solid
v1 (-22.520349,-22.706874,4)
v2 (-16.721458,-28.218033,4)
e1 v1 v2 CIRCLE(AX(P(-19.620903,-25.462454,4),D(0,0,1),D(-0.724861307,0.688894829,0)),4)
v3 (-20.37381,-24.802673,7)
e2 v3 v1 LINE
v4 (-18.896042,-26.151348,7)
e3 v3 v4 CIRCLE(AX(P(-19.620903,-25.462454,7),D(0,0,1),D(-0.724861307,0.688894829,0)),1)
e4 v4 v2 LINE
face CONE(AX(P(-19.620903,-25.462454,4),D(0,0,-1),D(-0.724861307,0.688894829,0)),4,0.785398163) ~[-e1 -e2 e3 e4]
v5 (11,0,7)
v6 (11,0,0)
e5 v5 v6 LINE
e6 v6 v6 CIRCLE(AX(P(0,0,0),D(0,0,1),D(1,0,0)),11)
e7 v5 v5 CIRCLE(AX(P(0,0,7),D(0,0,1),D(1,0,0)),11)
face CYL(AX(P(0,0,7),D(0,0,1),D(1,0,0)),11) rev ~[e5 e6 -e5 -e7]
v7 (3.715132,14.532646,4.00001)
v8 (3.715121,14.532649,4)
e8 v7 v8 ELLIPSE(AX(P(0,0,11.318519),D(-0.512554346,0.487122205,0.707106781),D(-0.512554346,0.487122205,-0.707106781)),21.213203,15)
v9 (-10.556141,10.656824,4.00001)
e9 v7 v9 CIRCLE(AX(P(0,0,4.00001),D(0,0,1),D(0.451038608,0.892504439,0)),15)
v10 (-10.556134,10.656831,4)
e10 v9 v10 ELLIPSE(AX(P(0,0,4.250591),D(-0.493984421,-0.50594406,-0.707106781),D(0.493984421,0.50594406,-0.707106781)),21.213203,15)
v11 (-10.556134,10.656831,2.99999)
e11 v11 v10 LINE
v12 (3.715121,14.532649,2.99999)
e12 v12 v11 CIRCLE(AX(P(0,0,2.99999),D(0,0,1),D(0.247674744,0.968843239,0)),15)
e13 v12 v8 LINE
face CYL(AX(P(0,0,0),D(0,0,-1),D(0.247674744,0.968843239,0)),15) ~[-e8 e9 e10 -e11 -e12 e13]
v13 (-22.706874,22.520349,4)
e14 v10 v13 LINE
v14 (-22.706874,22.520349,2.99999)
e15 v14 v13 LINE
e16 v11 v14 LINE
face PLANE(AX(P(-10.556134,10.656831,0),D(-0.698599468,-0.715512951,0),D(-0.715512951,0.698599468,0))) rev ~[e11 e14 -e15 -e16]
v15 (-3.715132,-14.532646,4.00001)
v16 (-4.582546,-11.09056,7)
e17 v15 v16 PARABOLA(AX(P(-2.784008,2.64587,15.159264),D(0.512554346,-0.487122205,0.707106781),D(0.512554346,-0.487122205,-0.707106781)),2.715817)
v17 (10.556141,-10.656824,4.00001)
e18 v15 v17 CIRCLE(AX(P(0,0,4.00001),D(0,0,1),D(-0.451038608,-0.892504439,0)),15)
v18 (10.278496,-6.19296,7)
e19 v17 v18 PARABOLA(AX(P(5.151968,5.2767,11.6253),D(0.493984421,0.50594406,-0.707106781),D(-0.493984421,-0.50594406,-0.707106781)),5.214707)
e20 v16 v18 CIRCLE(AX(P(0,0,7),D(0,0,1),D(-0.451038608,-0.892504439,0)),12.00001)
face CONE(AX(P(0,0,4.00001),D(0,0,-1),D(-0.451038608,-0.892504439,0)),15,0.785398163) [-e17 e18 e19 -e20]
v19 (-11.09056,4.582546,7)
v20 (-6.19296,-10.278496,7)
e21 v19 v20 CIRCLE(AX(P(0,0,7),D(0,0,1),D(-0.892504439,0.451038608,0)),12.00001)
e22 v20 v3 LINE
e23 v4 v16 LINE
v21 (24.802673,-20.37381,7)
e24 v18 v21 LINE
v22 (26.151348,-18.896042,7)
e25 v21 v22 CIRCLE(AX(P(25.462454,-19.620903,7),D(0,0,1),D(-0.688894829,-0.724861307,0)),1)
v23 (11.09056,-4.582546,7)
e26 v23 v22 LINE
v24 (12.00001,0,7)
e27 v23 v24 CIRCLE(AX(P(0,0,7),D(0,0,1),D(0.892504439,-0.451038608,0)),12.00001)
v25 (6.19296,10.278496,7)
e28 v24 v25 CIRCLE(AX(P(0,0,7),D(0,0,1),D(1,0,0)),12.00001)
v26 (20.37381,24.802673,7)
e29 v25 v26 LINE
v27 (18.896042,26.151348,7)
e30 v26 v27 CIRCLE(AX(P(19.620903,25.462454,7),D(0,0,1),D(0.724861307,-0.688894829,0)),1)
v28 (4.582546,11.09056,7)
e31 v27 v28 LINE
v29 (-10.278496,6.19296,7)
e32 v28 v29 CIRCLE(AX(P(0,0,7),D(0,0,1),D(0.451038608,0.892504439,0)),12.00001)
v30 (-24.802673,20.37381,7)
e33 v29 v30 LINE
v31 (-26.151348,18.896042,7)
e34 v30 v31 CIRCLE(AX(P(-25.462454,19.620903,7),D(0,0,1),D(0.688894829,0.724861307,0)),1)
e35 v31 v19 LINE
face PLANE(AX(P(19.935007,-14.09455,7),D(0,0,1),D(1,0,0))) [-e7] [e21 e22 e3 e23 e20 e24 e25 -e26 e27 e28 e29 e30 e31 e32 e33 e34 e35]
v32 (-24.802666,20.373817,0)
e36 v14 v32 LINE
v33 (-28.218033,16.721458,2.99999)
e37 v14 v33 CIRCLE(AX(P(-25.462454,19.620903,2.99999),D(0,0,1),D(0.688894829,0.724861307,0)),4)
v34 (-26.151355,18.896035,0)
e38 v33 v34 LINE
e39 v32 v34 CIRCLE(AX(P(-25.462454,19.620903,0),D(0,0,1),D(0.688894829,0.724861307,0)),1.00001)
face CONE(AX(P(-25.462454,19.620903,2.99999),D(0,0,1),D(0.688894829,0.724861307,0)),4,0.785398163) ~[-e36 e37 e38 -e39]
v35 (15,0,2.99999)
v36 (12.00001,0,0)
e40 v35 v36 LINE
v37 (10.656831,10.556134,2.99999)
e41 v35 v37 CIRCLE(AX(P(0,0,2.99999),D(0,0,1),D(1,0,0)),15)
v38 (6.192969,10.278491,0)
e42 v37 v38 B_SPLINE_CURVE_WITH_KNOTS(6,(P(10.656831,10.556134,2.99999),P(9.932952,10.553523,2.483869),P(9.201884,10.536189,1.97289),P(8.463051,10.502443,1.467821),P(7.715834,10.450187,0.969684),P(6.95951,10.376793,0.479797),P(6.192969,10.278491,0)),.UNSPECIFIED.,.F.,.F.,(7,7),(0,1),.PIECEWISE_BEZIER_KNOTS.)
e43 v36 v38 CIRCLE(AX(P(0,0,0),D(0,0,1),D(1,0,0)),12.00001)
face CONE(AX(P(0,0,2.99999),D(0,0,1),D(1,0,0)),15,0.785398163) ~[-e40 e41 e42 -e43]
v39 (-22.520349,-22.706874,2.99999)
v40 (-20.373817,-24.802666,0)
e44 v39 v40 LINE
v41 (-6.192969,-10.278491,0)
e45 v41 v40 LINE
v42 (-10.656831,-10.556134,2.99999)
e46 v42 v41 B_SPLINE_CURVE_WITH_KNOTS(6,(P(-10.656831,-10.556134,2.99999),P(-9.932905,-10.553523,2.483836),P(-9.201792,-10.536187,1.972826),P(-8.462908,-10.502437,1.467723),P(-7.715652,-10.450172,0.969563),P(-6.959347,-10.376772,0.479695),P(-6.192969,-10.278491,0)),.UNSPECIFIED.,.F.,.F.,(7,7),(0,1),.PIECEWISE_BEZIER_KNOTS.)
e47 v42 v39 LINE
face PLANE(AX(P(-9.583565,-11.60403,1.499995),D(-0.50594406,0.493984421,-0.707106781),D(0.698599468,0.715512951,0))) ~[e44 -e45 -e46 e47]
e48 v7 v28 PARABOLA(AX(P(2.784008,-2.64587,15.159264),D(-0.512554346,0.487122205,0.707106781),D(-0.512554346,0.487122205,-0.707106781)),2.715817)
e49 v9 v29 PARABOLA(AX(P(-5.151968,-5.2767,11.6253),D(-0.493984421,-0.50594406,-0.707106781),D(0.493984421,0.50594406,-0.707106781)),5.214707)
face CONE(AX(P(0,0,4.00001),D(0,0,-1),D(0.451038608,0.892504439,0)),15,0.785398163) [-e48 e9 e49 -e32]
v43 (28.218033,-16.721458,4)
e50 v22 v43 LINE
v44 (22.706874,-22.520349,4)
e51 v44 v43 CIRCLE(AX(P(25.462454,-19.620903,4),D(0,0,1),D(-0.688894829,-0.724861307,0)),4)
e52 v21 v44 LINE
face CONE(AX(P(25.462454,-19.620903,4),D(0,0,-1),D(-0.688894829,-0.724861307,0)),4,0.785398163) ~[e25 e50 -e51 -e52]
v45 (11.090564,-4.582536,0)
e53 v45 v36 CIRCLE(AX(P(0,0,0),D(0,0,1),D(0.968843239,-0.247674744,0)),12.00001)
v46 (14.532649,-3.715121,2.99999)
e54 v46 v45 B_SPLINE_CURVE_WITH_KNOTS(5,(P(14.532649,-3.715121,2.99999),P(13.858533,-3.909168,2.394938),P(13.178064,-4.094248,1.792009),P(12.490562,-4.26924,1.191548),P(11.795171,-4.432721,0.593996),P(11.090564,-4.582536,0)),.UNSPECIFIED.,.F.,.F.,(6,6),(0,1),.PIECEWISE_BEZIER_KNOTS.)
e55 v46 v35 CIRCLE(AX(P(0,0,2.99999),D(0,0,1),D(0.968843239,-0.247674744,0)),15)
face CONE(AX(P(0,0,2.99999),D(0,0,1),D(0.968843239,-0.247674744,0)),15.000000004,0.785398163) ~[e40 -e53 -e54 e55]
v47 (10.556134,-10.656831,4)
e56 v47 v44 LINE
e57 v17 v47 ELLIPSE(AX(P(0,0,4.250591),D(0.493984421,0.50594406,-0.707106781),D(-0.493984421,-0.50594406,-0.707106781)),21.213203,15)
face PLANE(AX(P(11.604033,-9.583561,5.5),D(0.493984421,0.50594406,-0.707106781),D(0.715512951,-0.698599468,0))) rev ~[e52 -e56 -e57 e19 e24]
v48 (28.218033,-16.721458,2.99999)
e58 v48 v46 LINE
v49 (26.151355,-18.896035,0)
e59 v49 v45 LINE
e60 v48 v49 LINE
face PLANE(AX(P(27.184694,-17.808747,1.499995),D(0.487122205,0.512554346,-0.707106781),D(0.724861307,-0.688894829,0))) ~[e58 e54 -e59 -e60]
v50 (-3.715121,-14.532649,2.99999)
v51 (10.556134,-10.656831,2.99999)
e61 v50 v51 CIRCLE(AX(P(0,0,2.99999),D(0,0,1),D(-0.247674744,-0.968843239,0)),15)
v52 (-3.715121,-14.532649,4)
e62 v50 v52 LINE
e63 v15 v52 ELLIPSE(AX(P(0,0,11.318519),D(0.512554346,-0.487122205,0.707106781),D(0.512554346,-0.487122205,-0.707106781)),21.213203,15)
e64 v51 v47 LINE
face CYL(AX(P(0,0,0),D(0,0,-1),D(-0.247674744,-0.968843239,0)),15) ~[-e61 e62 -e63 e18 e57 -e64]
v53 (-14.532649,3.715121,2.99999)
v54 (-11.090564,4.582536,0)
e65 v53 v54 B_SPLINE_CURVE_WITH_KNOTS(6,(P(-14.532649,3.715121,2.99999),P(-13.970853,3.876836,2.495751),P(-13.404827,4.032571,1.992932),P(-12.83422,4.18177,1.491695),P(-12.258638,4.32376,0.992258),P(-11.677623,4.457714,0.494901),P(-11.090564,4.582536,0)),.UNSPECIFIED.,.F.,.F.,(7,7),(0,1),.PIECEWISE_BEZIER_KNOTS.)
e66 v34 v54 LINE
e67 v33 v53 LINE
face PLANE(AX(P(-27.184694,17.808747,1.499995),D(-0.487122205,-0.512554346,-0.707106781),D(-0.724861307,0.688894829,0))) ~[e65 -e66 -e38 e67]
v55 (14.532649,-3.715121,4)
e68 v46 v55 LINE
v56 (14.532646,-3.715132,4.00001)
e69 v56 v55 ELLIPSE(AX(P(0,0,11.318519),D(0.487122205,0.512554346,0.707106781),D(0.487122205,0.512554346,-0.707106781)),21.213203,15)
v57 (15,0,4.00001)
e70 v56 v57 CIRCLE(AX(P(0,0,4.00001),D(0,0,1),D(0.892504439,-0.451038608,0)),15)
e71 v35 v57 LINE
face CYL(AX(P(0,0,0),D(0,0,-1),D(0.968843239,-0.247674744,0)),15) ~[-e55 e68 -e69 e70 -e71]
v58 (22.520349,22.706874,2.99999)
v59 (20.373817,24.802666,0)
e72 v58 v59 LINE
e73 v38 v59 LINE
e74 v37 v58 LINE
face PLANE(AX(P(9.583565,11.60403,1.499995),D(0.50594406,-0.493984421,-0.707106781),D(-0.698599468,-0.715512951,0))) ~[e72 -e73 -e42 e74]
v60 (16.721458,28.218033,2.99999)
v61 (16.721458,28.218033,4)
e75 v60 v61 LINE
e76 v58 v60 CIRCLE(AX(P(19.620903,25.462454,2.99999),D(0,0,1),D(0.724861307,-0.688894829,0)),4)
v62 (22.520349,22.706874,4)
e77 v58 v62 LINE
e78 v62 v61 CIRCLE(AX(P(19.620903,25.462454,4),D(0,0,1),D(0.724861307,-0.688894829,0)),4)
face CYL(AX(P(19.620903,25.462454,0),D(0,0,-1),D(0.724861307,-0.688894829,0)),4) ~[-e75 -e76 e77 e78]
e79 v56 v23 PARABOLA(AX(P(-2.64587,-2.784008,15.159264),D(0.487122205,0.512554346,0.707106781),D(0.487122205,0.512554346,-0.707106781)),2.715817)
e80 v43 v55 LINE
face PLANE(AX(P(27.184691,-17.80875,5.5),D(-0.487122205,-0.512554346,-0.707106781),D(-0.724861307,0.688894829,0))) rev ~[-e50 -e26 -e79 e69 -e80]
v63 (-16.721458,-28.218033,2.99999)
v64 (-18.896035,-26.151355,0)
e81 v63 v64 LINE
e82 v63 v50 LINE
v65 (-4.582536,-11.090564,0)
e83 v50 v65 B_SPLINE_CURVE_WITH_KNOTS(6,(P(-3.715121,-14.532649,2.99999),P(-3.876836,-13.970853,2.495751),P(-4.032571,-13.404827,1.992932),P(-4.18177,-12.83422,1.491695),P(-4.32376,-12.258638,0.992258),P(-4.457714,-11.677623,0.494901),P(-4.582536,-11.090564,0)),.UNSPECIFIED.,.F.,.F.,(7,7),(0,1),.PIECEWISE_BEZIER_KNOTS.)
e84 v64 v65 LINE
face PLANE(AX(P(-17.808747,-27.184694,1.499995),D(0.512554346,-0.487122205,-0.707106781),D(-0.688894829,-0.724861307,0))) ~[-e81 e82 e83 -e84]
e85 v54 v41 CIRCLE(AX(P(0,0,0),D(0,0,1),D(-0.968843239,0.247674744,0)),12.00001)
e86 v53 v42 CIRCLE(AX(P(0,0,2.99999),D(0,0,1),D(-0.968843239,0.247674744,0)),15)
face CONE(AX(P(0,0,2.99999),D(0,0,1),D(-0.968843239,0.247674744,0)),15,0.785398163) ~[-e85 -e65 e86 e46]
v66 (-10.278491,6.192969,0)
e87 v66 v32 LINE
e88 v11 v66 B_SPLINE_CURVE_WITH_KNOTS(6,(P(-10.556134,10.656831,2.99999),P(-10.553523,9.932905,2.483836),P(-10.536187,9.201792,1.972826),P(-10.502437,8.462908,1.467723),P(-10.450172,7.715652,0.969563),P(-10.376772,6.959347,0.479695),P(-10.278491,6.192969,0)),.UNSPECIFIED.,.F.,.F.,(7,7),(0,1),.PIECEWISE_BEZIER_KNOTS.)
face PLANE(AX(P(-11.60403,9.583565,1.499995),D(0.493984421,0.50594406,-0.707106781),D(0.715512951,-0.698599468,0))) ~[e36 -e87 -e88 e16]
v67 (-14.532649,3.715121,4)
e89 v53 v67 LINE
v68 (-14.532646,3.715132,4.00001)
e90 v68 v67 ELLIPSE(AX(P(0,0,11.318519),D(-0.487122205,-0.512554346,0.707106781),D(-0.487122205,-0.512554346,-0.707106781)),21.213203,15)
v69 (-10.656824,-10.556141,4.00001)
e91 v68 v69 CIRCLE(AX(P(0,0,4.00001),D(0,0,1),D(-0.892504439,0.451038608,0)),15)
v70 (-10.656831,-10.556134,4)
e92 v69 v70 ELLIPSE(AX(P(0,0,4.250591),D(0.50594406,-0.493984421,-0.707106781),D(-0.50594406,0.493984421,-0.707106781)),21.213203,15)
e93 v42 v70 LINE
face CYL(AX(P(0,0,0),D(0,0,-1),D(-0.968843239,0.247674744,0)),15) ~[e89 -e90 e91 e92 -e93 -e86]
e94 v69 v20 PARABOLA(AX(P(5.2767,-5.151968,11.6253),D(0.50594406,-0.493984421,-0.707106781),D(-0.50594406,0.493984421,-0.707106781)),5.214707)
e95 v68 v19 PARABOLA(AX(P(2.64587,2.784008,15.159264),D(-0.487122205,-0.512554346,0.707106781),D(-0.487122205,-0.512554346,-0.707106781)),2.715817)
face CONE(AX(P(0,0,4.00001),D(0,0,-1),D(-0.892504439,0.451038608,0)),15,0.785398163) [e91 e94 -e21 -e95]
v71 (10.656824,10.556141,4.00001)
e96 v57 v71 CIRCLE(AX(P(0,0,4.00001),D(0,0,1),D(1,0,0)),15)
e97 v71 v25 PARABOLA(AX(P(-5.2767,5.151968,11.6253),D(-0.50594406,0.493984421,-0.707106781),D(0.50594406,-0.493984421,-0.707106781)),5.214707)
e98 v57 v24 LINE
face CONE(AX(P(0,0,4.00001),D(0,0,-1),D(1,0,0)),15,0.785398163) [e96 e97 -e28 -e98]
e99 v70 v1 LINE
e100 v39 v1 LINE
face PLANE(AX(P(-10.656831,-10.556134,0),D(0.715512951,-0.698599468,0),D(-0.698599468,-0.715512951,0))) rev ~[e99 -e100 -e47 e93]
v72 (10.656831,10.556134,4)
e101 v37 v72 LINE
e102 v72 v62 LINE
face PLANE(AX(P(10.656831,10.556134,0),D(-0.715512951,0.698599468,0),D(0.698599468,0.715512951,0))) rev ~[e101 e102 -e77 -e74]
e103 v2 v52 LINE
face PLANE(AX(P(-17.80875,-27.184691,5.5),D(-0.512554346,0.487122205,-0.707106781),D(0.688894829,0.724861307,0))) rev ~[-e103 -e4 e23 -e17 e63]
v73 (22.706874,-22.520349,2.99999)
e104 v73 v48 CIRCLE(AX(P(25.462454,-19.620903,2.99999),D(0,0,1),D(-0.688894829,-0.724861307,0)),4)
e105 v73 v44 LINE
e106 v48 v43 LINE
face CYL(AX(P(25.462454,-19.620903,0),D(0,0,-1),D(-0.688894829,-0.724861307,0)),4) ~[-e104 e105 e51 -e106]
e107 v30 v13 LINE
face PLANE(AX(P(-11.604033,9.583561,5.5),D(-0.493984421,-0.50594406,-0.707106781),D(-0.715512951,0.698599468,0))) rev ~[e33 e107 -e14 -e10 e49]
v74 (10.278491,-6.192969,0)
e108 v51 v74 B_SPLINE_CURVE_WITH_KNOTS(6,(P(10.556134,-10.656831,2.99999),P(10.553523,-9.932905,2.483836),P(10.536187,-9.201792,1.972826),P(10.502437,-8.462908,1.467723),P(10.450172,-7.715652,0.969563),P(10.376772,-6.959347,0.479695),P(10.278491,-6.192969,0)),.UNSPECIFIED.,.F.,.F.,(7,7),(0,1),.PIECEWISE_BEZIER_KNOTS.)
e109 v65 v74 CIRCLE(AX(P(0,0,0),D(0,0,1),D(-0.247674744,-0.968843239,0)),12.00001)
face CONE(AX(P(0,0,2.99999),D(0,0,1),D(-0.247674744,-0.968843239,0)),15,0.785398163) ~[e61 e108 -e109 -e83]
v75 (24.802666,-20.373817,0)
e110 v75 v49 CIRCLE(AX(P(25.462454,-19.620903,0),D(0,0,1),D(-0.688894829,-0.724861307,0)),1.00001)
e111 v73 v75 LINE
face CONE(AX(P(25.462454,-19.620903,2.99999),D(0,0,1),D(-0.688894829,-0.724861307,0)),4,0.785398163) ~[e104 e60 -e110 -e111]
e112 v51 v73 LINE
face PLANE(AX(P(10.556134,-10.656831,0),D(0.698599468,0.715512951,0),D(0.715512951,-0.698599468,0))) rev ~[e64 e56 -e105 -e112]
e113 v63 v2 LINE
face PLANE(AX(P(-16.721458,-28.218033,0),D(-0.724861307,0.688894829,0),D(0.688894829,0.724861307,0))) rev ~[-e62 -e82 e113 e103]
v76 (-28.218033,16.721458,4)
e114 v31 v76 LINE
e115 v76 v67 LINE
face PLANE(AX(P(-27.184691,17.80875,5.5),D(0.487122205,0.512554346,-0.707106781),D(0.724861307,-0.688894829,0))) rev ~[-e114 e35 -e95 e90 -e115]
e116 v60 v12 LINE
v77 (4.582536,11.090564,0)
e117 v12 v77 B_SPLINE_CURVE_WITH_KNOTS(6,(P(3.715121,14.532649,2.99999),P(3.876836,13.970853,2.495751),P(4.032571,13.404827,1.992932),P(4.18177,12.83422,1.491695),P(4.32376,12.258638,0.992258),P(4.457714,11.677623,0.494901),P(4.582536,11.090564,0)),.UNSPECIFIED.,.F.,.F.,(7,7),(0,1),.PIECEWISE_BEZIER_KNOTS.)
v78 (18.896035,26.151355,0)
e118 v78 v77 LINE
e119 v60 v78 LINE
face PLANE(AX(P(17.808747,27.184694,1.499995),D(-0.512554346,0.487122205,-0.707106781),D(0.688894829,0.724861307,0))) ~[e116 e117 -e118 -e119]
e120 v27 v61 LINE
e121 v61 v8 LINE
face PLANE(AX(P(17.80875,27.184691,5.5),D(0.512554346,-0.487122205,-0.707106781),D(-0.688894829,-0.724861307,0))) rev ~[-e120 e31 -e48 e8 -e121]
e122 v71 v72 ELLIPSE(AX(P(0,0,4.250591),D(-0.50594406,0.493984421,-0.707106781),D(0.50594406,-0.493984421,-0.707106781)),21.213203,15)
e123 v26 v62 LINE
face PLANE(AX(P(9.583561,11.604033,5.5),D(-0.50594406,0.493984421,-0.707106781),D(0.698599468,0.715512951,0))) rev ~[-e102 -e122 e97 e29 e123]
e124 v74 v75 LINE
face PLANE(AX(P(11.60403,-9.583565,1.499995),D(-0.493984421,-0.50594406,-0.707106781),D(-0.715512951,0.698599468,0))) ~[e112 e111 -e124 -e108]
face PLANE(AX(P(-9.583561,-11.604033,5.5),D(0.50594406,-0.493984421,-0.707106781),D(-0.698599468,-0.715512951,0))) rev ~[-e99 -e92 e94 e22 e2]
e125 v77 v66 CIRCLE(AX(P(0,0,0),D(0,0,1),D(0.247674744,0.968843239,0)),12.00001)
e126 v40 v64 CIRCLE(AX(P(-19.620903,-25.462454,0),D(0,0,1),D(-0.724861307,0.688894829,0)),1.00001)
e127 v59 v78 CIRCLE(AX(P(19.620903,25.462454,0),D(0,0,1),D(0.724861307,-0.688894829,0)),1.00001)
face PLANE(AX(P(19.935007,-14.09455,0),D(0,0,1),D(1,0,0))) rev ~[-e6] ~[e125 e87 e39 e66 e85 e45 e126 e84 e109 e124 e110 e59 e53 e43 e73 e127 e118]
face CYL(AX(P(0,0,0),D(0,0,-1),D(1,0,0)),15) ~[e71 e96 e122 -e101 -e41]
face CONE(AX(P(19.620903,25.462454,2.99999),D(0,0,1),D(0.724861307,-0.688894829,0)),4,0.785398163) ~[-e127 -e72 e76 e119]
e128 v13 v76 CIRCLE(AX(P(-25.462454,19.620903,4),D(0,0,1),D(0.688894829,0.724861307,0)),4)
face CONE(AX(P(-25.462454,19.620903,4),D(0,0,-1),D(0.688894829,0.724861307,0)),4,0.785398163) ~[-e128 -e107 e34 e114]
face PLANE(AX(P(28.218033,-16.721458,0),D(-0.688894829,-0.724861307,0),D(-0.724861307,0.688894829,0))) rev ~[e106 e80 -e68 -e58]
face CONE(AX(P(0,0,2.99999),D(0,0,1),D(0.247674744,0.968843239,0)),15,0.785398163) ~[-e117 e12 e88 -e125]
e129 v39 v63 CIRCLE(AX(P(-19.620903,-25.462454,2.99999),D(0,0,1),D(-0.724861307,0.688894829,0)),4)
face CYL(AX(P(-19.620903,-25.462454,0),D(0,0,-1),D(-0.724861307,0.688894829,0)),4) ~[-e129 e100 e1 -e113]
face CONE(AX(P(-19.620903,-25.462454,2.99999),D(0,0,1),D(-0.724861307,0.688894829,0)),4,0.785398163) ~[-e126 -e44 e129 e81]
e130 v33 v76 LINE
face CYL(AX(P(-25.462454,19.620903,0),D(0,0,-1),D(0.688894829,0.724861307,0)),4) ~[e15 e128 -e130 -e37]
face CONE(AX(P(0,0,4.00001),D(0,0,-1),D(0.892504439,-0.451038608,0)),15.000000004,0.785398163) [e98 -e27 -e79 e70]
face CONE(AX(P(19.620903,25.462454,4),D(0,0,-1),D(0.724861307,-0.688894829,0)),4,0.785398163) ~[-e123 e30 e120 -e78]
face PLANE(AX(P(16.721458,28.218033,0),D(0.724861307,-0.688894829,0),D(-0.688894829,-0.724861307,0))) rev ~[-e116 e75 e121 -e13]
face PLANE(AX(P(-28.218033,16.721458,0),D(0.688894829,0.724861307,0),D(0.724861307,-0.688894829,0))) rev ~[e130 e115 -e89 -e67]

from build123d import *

# Parameters (mm, degrees)
F1_DEPTH = 7
F2_R     = 11
F3_DEPTH = 25
F4_DEPTH = 7
F5_SIZE  = 3
F7_SIZE  = 2.99999


# Not quite as in the source:
# - a fillet or chamfer is up to 0.001 mm smaller than in the source, because OpenCascade refuses the exact size
# - a feature of the source that left no trace in its solid (it failed there, or was rolled back) is left out


with BuildPart() as f1:
    # F0 (on Top) → F1 (new body)
    with BuildSketch(Plane.XY):
        with BuildLine():
            ThreePointArc((-14.5326485793, 3.7151211652), (-13.0157052433, 7.4559651971), (-10.5561338075, 10.6568306282))
            Line((-10.5561338075, 10.6568306282), (-22.7068742866, 22.5203487058))
            ThreePointArc((-22.7068742866, 22.5203487058), (-28.3618988311, 22.3764827918), (-28.2180329171, 16.7214582473))
            Line((-28.2180329171, 16.7214582473), (-14.5326485793, 3.7151211652))
        make_face()
        with BuildLine():
            ThreePointArc((14.5326485793, -3.7151211652), (14.8827035294, -1.872200752), (15, 0))
            ThreePointArc((15, 0), (13.8717781741, 5.7073435404), (10.6568306282, 10.5561338075))
            ThreePointArc((10.6568306282, 10.5561338075), (7.4559651971, 13.0157052433), (3.7151211652, 14.5326485793))
            ThreePointArc((3.7151211652, 14.5326485793), (-3.9313298883, 14.4756569906), (-10.5561338075, 10.6568306282))
            ThreePointArc((-10.5561338075, 10.6568306282), (-13.0157052433, 7.4559651971), (-14.5326485793, 3.7151211652))
            ThreePointArc((-14.5326485793, 3.7151211652), (-14.4756569906, -3.9313298883), (-10.6568306282, -10.5561338075))
            ThreePointArc((-10.6568306282, -10.5561338075), (-7.4559651971, -13.0157052433), (-3.7151211652, -14.5326485793))
            ThreePointArc((-3.7151211652, -14.5326485793), (3.9313298883, -14.4756569906), (10.5561338075, -10.6568306282))
            ThreePointArc((10.5561338075, -10.6568306282), (13.0157052433, -7.4559651971), (14.5326485793, -3.7151211652))
        make_face()
        with BuildLine():
            ThreePointArc((3.7151211652, 14.5326485793), (7.4559651971, 13.0157052433), (10.6568306282, 10.5561338075))
            Line((10.6568306282, 10.5561338075), (22.5203487058, 22.7068742866))
            ThreePointArc((22.5203487058, 22.7068742866), (22.3764827918, 28.3618988311), (16.7214582473, 28.2180329171))
            Line((16.7214582473, 28.2180329171), (3.7151211652, 14.5326485793))
        make_face()
        with BuildLine():
            Line((-16.7214582473, -28.2180329171), (-3.7151211652, -14.5326485793))
            ThreePointArc((-3.7151211652, -14.5326485793), (-7.4559651971, -13.0157052433), (-10.6568306282, -10.5561338075))
            Line((-10.6568306282, -10.5561338075), (-22.5203487058, -22.7068742866))
            ThreePointArc((-22.5203487058, -22.7068742866), (-22.3764827918, -28.3618988311), (-16.7214582473, -28.2180329171))
        make_face()
    extrude(amount=F1_DEPTH)

    # F2 (on face) → F3 (cut)
    with BuildSketch(Plane.XY.offset(7)):
        Circle(F2_R)
    extrude(amount=-F3_DEPTH, mode=Mode.SUBTRACT)

    # F0 (on Top) → F4 (join)
    with BuildSketch(Plane.XY):
        with BuildLine():
            Line((28.2180329171, -16.7214582473), (14.5326485793, -3.7151211652))
            ThreePointArc((14.5326485793, -3.7151211652), (13.0157052433, -7.4559651971), (10.5561338075, -10.6568306282))
            Line((10.5561338075, -10.6568306282), (22.7068742866, -22.5203487058))
            ThreePointArc((22.7068742866, -22.5203487058), (28.3618988311, -22.3764827918), (28.2180329171, -16.7214582473))
        make_face()
    extrude(amount=F4_DEPTH)

    # F5
    f5_edges = [f1.edges().sort_by_distance(p)[0] for p in [
        (16.58859, 16.631504, 7),
        (-16.631504, 16.58859, 7),
        (-16.58859, -16.631504, 7),
        (16.631504, -16.58859, 7),
    ]]
    chamfer(f5_edges, length=F5_SIZE)

    # F7 (size 3 in the source; OpenCascade refuses exactly that, so slightly less here)
    f7_edges = [f1.edges().sort_by_distance(p)[0] for p in [
        (16.631504, -16.58859, 0),
        (3.93133, -14.475657, 0),
        (-10.21829, -21.375341, 0),
        (-16.58859, -16.631504, 0),
        (-14.475657, -3.93133, 0),
        (-21.375341, 10.21829, 0),
        (-16.631504, 16.58859, 0),
        (-28.361899, 22.376483, 0),
        (10.21829, 21.375341, 0),
        (16.58859, 16.631504, 0),
        (22.376483, 28.361899, 0),
        (28.361899, -22.376483, 0),
        (21.375341, -10.21829, 0),
        (-22.376483, -28.361899, 0),
        (-3.93133, 14.475657, 0),
        (14.475657, 3.93133, 0),
        (14.475657, 3.93133, 7),
        (3.93133, -14.475657, 7),
        (-14.475657, -3.93133, 7),
        (-3.93133, 14.475657, 7),
    ]]
    chamfer(f7_edges, length=F7_SIZE)


solid = f1.part
